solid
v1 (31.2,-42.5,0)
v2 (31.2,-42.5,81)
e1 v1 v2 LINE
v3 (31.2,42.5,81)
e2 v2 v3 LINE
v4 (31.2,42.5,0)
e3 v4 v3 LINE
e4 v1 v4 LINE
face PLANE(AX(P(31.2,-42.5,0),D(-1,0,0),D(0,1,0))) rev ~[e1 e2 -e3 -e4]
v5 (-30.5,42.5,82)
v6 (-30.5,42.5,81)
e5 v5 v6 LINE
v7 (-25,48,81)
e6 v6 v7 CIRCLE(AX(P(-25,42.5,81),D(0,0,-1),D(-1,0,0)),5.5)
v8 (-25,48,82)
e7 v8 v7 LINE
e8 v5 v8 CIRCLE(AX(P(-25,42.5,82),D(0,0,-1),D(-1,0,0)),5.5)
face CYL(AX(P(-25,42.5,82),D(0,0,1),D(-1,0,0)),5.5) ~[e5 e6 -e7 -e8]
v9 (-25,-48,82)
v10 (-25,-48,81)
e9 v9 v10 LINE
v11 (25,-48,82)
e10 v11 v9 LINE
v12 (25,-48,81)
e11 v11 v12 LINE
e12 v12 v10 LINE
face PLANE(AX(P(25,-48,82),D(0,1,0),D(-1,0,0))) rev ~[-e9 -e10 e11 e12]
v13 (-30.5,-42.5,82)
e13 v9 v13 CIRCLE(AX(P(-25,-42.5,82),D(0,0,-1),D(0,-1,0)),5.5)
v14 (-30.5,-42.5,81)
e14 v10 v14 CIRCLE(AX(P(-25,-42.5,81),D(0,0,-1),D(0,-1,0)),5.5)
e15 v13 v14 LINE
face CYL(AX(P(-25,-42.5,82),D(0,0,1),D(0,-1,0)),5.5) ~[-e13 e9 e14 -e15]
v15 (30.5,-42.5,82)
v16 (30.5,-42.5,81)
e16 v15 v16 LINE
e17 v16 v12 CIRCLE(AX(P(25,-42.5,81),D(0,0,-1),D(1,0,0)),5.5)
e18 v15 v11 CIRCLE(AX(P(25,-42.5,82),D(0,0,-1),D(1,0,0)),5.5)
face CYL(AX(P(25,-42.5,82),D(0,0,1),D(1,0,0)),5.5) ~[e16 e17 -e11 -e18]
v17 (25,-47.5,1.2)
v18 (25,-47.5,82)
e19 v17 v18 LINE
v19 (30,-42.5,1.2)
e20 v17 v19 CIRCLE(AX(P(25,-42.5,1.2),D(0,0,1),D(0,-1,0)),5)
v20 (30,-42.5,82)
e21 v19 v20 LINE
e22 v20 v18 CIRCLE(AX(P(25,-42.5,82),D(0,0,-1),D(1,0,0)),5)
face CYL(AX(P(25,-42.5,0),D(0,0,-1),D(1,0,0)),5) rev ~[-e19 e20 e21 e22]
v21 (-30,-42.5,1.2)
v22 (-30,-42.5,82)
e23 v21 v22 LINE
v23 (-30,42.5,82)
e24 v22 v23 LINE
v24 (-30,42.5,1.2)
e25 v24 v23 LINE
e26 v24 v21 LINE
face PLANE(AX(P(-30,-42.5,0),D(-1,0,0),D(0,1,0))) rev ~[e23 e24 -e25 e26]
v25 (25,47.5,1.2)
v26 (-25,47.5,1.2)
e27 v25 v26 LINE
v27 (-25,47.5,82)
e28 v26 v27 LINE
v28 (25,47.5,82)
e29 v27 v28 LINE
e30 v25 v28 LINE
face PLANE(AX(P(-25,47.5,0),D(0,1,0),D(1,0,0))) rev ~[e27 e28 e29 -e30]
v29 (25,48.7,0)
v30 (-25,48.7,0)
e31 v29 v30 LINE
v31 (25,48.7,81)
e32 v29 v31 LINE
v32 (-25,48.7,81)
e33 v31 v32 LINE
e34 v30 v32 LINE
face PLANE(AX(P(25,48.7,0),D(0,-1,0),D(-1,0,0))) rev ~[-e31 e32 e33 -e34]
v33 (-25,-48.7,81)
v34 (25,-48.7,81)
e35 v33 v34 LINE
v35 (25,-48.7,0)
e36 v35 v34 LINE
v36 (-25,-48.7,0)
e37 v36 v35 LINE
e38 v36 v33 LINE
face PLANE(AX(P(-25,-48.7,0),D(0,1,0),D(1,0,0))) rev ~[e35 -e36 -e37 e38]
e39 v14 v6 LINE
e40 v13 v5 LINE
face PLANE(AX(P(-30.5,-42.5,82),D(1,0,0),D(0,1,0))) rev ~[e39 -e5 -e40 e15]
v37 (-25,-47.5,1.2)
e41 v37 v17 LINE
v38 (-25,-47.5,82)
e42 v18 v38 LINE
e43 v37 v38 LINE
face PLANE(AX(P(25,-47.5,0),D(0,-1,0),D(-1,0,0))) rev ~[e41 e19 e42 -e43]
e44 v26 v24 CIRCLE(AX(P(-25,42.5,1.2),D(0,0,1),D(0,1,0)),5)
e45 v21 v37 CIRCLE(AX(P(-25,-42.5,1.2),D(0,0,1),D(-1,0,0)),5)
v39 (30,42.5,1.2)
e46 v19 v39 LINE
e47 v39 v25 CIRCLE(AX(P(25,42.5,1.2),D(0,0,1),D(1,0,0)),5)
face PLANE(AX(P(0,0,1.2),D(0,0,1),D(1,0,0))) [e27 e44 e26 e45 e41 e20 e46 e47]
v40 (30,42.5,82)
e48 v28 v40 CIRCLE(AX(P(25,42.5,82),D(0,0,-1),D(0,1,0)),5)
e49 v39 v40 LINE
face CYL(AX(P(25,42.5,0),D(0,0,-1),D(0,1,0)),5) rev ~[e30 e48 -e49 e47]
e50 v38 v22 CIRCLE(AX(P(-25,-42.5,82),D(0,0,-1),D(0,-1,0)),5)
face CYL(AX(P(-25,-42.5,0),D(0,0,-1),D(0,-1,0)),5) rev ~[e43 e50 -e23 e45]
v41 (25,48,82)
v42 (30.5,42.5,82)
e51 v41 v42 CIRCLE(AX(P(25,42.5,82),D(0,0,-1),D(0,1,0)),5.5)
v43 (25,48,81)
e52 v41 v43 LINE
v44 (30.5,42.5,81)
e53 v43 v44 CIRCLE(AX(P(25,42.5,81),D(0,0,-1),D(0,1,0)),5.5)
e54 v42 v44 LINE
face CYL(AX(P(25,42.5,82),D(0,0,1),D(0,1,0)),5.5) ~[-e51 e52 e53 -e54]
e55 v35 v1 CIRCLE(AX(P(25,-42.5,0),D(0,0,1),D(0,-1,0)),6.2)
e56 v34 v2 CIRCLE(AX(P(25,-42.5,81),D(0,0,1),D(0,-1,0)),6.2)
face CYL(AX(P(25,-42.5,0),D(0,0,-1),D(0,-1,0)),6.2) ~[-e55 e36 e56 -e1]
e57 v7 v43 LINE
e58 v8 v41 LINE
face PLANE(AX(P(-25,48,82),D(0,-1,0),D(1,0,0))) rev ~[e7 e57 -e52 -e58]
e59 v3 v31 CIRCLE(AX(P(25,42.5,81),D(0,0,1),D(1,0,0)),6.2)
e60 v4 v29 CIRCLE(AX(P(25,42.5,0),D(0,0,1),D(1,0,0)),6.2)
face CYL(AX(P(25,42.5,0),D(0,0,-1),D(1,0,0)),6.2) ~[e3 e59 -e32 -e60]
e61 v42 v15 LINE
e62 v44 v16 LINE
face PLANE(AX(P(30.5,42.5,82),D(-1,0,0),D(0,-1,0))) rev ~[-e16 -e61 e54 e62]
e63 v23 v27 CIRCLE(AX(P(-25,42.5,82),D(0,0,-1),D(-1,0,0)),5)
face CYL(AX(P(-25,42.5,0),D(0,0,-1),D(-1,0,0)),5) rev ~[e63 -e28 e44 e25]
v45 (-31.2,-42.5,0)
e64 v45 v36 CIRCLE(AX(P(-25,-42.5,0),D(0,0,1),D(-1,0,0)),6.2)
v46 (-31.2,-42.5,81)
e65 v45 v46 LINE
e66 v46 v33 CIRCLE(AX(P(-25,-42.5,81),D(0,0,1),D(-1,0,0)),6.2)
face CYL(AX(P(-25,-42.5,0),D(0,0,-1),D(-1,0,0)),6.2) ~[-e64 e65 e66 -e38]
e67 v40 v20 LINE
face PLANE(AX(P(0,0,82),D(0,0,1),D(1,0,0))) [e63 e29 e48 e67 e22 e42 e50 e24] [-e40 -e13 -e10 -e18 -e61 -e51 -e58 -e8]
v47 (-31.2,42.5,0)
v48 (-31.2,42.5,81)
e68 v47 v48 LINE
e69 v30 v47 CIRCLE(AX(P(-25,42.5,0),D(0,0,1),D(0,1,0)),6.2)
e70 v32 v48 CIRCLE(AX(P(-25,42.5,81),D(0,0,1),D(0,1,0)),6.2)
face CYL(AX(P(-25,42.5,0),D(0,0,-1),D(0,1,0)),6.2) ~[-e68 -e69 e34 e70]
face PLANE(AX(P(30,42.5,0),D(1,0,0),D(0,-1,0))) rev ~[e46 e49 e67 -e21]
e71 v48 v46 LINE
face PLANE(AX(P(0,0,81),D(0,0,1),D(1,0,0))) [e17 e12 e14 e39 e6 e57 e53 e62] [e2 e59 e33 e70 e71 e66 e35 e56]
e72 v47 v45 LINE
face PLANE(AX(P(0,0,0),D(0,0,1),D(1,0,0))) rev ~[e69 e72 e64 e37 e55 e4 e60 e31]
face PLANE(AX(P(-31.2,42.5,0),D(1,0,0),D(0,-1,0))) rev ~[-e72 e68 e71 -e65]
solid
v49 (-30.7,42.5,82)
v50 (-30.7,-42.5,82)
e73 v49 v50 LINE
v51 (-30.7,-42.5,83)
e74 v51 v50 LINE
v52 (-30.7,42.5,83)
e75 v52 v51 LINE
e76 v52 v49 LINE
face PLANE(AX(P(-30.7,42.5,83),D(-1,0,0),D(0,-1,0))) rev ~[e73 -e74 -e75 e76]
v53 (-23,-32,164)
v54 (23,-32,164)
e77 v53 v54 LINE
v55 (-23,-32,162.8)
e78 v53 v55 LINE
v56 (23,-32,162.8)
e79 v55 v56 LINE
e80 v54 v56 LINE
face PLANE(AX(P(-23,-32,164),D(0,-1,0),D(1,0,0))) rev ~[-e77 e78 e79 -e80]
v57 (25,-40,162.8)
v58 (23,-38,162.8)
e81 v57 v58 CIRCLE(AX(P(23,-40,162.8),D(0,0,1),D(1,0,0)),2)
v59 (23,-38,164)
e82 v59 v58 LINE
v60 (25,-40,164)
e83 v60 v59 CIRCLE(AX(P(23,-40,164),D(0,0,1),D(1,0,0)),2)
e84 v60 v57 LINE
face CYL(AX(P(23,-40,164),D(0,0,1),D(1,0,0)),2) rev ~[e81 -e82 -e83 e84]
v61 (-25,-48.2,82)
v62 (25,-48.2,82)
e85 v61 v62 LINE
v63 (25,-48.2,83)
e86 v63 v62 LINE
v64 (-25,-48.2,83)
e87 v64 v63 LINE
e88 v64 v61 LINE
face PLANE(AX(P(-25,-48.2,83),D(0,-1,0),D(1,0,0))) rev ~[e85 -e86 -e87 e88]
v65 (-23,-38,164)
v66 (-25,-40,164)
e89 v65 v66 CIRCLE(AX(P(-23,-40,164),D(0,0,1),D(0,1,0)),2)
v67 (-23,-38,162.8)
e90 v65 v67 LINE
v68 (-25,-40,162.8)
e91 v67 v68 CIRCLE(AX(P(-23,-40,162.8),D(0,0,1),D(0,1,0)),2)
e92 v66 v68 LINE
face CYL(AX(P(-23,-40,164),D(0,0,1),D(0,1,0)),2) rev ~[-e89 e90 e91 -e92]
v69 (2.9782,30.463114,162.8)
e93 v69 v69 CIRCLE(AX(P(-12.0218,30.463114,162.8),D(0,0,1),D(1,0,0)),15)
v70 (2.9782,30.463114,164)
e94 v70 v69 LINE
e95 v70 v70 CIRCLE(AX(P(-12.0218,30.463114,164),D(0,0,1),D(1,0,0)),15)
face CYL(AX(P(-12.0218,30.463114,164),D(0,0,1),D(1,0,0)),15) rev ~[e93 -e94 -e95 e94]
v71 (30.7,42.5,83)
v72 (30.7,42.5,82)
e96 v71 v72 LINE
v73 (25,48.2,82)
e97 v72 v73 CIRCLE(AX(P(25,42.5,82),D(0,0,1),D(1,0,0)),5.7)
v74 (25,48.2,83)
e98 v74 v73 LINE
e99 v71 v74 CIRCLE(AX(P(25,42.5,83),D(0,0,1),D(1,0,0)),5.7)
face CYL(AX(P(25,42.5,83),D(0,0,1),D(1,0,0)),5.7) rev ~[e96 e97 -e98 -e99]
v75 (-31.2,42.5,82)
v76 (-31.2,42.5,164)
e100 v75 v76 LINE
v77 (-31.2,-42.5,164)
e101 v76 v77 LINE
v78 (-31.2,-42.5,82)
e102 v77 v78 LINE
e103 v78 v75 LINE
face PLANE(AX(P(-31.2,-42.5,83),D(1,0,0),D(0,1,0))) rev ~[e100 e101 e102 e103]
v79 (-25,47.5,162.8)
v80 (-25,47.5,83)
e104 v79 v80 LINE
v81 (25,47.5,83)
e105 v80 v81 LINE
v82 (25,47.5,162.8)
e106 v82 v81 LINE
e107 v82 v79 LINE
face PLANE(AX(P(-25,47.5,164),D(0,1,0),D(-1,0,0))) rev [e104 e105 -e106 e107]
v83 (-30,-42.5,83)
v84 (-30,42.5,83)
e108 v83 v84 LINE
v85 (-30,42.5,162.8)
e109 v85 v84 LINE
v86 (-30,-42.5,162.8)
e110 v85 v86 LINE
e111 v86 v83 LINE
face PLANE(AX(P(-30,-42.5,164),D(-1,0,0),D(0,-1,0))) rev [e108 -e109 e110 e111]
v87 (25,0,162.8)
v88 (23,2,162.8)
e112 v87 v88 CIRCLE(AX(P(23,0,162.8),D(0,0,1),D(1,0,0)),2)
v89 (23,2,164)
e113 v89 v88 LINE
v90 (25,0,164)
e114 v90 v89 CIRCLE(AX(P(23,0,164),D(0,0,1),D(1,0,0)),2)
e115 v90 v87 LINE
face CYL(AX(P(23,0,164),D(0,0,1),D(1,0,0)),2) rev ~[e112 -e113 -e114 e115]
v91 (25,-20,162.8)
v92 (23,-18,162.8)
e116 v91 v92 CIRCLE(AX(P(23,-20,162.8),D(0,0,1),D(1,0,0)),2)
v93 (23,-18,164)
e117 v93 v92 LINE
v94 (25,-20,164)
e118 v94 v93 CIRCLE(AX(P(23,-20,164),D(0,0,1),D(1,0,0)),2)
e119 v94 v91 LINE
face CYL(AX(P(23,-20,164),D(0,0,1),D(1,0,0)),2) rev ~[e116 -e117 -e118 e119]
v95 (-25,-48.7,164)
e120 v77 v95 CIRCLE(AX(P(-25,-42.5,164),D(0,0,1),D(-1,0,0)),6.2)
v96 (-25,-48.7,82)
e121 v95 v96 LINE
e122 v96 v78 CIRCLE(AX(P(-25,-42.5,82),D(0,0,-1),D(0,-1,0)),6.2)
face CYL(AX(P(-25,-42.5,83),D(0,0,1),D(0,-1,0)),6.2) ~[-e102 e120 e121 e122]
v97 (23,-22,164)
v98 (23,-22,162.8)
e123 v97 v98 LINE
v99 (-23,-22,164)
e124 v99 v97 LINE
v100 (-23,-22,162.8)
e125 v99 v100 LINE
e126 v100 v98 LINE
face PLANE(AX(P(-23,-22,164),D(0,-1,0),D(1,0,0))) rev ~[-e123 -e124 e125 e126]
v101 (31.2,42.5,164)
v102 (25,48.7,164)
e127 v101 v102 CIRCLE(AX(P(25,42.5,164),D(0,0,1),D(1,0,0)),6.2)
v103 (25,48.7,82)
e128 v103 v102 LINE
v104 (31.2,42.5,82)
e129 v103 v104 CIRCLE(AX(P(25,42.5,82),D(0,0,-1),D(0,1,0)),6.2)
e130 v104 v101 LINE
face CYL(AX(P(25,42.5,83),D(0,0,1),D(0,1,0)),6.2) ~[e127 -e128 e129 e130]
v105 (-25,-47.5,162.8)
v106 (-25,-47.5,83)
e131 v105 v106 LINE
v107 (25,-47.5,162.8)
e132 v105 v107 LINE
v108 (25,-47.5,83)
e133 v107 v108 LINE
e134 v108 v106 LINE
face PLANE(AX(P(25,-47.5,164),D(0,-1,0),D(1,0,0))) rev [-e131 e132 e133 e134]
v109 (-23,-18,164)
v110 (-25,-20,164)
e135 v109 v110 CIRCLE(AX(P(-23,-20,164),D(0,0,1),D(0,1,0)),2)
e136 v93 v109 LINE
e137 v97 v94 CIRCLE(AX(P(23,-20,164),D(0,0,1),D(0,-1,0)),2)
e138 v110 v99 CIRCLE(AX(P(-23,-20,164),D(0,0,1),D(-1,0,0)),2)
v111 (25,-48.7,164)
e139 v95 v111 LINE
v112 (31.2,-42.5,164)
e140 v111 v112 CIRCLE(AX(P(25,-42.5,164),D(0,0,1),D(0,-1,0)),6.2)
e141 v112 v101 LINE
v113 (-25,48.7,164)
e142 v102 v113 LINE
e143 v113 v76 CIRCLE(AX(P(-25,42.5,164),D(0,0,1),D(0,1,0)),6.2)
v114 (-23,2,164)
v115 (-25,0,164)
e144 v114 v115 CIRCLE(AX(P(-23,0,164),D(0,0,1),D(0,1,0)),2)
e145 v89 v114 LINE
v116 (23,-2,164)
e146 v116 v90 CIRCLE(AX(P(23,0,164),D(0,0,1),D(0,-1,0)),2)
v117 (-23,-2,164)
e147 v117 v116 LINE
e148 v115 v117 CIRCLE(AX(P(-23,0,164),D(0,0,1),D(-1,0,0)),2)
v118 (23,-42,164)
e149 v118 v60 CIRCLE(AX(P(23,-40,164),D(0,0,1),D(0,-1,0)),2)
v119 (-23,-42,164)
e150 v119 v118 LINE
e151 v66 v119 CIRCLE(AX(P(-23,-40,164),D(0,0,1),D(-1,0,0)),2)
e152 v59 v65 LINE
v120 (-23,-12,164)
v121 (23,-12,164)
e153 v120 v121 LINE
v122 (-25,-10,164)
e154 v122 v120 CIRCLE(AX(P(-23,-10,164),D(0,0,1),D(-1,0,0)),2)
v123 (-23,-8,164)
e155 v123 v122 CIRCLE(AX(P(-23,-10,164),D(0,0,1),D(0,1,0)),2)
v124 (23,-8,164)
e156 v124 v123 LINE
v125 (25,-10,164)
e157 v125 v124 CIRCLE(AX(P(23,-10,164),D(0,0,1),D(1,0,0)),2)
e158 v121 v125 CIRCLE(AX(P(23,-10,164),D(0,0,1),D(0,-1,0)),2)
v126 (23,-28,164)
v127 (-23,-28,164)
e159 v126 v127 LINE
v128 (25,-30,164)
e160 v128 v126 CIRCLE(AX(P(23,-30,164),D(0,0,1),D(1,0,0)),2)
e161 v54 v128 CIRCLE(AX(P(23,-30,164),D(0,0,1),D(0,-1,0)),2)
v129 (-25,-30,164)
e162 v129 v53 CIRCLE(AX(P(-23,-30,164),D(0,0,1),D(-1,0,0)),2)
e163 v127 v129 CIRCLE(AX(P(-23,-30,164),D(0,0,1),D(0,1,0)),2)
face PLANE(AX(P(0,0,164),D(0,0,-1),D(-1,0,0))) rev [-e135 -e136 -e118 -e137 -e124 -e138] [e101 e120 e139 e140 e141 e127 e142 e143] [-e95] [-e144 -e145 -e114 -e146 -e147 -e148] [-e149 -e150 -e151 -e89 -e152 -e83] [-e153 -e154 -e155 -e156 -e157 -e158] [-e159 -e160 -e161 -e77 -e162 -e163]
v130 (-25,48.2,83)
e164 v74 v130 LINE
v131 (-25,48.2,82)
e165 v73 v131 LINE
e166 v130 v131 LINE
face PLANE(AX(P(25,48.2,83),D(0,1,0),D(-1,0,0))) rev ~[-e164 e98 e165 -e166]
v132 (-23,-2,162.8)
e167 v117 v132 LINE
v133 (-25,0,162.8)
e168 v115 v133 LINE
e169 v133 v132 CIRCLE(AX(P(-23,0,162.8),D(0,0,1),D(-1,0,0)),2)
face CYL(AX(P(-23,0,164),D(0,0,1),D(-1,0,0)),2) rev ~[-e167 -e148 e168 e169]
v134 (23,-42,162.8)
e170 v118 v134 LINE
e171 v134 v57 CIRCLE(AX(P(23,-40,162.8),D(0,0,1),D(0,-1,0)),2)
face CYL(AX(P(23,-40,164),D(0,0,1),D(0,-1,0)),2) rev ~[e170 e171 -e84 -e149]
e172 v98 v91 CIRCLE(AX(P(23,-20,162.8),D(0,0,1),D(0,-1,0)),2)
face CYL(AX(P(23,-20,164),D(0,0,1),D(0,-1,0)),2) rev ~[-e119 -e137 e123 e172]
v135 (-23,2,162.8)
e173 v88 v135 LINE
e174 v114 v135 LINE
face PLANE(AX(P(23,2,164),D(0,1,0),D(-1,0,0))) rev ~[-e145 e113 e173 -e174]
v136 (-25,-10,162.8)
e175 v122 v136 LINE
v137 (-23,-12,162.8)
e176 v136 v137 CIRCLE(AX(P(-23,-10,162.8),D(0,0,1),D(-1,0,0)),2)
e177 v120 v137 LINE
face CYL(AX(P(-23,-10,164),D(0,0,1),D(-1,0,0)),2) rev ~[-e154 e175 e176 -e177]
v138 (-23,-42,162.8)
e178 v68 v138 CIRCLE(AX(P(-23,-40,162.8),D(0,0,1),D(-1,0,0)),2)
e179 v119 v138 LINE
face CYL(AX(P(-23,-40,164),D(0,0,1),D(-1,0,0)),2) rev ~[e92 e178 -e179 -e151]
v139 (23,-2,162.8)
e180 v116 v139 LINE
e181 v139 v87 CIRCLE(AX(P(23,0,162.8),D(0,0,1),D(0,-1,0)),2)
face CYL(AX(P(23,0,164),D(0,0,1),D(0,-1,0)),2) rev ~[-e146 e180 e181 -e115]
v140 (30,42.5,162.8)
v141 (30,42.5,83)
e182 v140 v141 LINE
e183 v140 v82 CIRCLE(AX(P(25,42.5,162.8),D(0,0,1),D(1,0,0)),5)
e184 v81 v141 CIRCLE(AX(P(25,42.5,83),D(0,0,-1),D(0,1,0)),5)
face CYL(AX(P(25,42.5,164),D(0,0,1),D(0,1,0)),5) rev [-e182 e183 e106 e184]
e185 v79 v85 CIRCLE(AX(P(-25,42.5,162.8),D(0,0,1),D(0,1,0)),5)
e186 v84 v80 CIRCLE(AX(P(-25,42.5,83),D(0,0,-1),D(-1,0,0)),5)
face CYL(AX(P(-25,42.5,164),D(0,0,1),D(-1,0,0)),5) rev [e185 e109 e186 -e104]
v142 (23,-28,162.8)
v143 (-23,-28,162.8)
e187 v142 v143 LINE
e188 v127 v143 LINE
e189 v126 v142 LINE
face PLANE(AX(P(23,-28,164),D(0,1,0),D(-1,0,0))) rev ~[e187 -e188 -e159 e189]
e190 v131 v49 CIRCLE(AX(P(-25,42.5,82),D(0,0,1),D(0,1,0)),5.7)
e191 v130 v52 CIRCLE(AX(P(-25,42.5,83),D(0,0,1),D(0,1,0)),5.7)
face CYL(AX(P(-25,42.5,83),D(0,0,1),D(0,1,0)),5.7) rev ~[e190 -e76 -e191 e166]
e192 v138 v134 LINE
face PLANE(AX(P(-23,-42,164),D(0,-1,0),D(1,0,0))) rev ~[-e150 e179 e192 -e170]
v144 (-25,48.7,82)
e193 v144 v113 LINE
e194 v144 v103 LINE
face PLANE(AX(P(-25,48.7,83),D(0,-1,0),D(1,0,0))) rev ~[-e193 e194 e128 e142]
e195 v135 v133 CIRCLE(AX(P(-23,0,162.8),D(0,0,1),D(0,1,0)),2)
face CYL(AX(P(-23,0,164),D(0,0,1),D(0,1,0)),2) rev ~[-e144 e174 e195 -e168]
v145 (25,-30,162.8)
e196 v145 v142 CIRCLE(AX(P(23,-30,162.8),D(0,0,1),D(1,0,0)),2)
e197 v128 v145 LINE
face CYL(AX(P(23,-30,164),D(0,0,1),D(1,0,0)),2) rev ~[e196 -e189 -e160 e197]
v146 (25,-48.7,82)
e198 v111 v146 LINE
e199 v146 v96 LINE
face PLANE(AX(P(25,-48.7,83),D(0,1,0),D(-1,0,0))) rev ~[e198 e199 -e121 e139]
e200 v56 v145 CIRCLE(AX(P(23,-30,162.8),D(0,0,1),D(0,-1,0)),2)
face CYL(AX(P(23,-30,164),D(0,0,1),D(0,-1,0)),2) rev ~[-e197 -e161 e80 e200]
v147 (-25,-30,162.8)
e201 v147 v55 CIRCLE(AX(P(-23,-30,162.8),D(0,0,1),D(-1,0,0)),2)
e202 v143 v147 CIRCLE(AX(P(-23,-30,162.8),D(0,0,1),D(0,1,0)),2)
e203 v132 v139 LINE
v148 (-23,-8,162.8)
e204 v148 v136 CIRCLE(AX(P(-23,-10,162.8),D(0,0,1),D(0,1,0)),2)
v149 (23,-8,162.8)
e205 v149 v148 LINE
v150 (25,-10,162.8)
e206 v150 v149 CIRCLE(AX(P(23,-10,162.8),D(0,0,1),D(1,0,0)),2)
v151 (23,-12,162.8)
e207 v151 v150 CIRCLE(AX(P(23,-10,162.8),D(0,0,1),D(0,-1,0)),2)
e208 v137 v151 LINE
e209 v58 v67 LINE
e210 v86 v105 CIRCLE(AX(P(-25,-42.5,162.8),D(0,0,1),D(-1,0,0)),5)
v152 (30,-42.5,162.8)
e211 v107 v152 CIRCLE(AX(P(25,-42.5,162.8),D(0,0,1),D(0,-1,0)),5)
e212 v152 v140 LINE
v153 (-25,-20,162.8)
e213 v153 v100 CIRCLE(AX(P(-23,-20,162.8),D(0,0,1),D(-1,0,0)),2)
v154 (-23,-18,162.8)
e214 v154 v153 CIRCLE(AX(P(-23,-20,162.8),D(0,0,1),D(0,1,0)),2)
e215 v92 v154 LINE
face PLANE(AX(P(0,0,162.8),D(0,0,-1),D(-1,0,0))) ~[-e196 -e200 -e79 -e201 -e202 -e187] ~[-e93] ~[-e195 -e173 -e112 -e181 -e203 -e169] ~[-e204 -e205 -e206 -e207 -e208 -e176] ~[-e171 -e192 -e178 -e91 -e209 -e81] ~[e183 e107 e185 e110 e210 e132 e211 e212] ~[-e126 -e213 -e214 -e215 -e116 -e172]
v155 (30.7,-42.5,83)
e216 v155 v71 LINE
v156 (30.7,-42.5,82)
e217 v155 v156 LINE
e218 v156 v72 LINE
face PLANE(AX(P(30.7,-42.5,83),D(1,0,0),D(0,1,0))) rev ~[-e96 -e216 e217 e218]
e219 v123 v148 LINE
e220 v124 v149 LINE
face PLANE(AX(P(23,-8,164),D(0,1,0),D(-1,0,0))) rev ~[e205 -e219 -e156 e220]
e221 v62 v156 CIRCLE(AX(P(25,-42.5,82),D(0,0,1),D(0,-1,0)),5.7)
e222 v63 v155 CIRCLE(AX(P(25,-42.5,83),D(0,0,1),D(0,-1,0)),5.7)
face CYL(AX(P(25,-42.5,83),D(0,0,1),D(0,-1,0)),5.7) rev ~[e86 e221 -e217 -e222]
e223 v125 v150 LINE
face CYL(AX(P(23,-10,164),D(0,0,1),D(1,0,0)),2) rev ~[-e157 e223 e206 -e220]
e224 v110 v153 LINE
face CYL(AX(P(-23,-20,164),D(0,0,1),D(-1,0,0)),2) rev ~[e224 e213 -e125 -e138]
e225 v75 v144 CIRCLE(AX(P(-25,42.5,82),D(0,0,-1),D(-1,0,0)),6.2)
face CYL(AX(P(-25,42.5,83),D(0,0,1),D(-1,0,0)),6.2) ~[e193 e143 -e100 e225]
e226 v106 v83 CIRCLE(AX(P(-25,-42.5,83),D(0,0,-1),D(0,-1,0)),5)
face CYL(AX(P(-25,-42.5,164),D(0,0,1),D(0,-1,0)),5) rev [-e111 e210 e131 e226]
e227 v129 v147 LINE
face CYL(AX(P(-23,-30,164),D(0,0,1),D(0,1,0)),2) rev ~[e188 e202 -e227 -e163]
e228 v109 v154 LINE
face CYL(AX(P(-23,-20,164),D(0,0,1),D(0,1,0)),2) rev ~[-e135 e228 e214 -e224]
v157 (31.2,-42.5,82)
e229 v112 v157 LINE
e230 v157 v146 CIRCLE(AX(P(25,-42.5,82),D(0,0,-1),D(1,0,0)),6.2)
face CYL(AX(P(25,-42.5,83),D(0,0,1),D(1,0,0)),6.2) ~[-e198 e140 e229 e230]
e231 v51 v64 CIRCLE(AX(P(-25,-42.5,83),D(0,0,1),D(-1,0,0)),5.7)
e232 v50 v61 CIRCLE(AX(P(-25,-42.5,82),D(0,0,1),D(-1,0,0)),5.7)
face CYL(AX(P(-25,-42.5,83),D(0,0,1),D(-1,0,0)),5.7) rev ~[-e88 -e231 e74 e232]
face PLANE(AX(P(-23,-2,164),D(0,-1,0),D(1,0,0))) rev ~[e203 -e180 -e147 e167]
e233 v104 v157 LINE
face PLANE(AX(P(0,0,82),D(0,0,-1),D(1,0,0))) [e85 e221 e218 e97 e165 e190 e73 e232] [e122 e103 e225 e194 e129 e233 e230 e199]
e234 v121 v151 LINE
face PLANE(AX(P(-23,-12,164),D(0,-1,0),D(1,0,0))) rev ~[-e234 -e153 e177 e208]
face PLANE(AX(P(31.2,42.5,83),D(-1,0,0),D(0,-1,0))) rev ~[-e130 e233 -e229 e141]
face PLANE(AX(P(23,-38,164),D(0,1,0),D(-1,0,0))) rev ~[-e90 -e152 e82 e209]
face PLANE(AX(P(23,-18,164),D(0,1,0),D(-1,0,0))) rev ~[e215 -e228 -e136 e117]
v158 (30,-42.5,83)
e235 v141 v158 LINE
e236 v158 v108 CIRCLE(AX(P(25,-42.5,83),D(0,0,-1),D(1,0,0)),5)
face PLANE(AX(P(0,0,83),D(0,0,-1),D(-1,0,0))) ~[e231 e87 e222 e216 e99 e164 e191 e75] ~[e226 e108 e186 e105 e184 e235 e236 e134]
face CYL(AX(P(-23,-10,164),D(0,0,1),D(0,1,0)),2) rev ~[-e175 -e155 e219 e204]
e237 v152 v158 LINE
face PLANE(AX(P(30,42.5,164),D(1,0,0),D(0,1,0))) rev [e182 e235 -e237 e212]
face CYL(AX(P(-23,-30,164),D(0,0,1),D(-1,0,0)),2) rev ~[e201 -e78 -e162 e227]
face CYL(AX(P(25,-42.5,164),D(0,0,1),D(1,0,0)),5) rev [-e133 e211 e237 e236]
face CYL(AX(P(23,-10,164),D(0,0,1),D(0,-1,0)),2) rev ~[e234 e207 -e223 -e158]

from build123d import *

# Parameters (mm, degrees)
F1_DEPTH  = 82
F2_DEPTH  = 1.2
F4_DEPTH  = 1
F7_DEPTH  = 1
F8_DEPTH  = 1
F9_R      = 15
F10_DEPTH = 1.2


# Not quite as in the source:
# - a feature names something its author has since deleted; it is built from what else it names


with BuildPart() as f1:
    # F0 (on Top) → F1 (new body)
    with BuildSketch(Plane.XY):
        with BuildLine():
            Line((31.2, -42.5), (31.2, 42.5))
            ThreePointArc((31.2, 42.5), (29.3840620434, 46.8840620434), (25, 48.7))
            Line((25, 48.7), (-25, 48.7))
            ThreePointArc((-25, 48.7), (-29.3840620434, 46.8840620434), (-31.2, 42.5))
            Line((-31.2, 42.5), (-31.2, -42.5))
            ThreePointArc((-31.2, -42.5), (-29.3840620434, -46.8840620434), (-25, -48.7))
            Line((-25, -48.7), (25, -48.7))
            ThreePointArc((25, -48.7), (29.3840620434, -46.8840620434), (31.2, -42.5))
        make_face()
        with BuildLine():
            Line((-25, 47.5), (25, 47.5))
            ThreePointArc((25, 47.5), (28.5355339059, 46.0355339059), (30, 42.5))
            Line((30, 42.5), (30, -42.5))
            ThreePointArc((30, -42.5), (28.5355339059, -46.0355339059), (25, -47.5))
            Line((25, -47.5), (-25, -47.5))
            ThreePointArc((-25, -47.5), (-28.5355339059, -46.0355339059), (-30, -42.5))
            Line((-30, -42.5), (-30, 42.5))
            ThreePointArc((-30, 42.5), (-28.5355339059, 46.0355339059), (-25, 47.5))
        make_face(mode=Mode.SUBTRACT)
    extrude(amount=F1_DEPTH)

    # F0 (on Top) → F2 (join)
    with BuildSketch(Plane.XY):
        with BuildLine():
            ThreePointArc((30, 42.5), (28.5355339059, 46.0355339059), (25, 47.5))
            Line((25, 47.5), (-25, 47.5))
            ThreePointArc((-25, 47.5), (-28.5355339059, 46.0355339059), (-30, 42.5))
            Line((-30, 42.5), (-30, -42.5))
            ThreePointArc((-30, -42.5), (-28.5355339059, -46.0355339059), (-25, -47.5))
            Line((-25, -47.5), (25, -47.5))
            ThreePointArc((25, -47.5), (28.5355339059, -46.0355339059), (30, -42.5))
            Line((30, -42.5), (30, 42.5))
        make_face()
    extrude(amount=F2_DEPTH)

    # F3 (on face) → F4 (cut)
    with BuildSketch(Plane.XY.offset(82)):
        with BuildLine():
            ThreePointArc((25, -48.7), (29.3840620434, -46.8840620434), (31.2, -42.5))
            Line((31.2, -42.5), (31.2, 42.5))
            ThreePointArc((31.2, 42.5), (29.3840620434, 46.8840620434), (25, 48.7))
            Line((25, 48.7), (-25, 48.7))
            ThreePointArc((-25, 48.7), (-29.3840620434, 46.8840620434), (-31.2, 42.5))
            Line((-31.2, 42.5), (-31.2, -42.5))
            ThreePointArc((-31.2, -42.5), (-29.3840620434, -46.8840620434), (-25, -48.7))
            Line((-25, -48.7), (25, -48.7))
        make_face()
        with BuildLine():
            ThreePointArc((-25, -48), (-28.8890872965, -46.3890872965), (-30.5, -42.5))
            Line((-30.5, -42.5), (-30.5, 42.5))
            ThreePointArc((-30.5, 42.5), (-28.8890872965, 46.3890872965), (-25, 48))
            Line((-25, 48), (25, 48))
            ThreePointArc((25, 48), (28.8890872965, 46.3890872965), (30.5, 42.5))
            Line((30.5, 42.5), (30.5, -42.5))
            ThreePointArc((30.5, -42.5), (28.8890872965, -46.3890872965), (25, -48))
            Line((25, -48), (-25, -48))
        make_face(mode=Mode.SUBTRACT)
    extrude(amount=-F4_DEPTH, mode=Mode.SUBTRACT)


with BuildPart() as f5_1:
    # F5: instance of F1
    add(f1.part.mirror(Plane.XY.offset(82)))

    # F6 (on face) → F7 (join)
    with BuildSketch(Plane(origin=(0, 0, 83), x_dir=(1, 0, 0), z_dir=(0, 0, -1))):
        with BuildLine():
            Line((31.2, -42.5), (31.2, 42.5))
            ThreePointArc((31.2, 42.5), (29.3840620434, 46.8840620434), (25, 48.7))
            Line((25, 48.7), (-25, 48.7))
            ThreePointArc((-25, 48.7), (-29.3840620434, 46.8840620434), (-31.2, 42.5))
            Line((-31.2, 42.5), (-31.2, -42.5))
            ThreePointArc((-31.2, -42.5), (-29.3840620434, -46.8840620434), (-25, -48.7))
            Line((-25, -48.7), (25, -48.7))
            ThreePointArc((25, -48.7), (29.3840620434, -46.8840620434), (31.2, -42.5))
        make_face()
        with BuildLine():
            ThreePointArc((25, 48.2), (29.0305086528, 46.5305086528), (30.7, 42.5))
            Line((30.7, 42.5), (30.7, -42.5))
            ThreePointArc((30.7, -42.5), (29.0305086528, -46.5305086528), (25, -48.2))
            Line((25, -48.2), (-25, -48.2))
            ThreePointArc((-25, -48.2), (-29.0305086528, -46.5305086528), (-30.7, -42.5))
            Line((-30.7, -42.5), (-30.7, 42.5))
            ThreePointArc((-30.7, 42.5), (-29.0305086528, 46.5305086528), (-25, 48.2))
            Line((-25, 48.2), (25, 48.2))
        make_face(mode=Mode.SUBTRACT)
    extrude(amount=F7_DEPTH)

    # F8 (cut): a face of the model
    f8_faces = [f5_1.faces().sort_by_distance(p)[0] for p in [
        (28.808660311, -46.308660311, 82),
    ]]
    extrude(f8_faces, amount=-F8_DEPTH, mode=Mode.SUBTRACT)

    # F9 (on face) → F10 (cut)
    with BuildSketch(Plane.XY.offset(164)):
        with Locations((-12.0217995225, 30.4631138757)):
            Circle(F9_R)
        with BuildLine():
            ThreePointArc((25, 0), (24.4142135624, 1.4142135624), (23, 2))
            Line((23, 2), (-23, 2))
            ThreePointArc((-23, 2), (-24.4142135624, 1.4142135624), (-25, 0))
            ThreePointArc((-25, 0), (-24.4142135624, -1.4142135624), (-23, -2))
            Line((-23, -2), (23, -2))
            ThreePointArc((23, -2), (24.4142135624, -1.4142135624), (25, 0))
        make_face()
        with BuildLine():
            ThreePointArc((-23, -8), (-24.4142135624, -8.5857864376), (-25, -10))
            ThreePointArc((-25, -10), (-24.4142135624, -11.4142135624), (-23, -12))
            Line((-23, -12), (23, -12))
            ThreePointArc((23, -12), (24.4142135624, -11.4142135624), (25, -10))
            ThreePointArc((25, -10), (24.4142135624, -8.5857864376), (23, -8))
            Line((23, -8), (-23, -8))
        make_face()
        with BuildLine():
            ThreePointArc((-23, -18), (-24.4142135624, -18.5857864376), (-25, -20))
            ThreePointArc((-25, -20), (-24.4142135624, -21.4142135624), (-23, -22))
            Line((-23, -22), (23, -22))
            ThreePointArc((23, -22), (24.4142135624, -21.4142135624), (25, -20))
            ThreePointArc((25, -20), (24.4142135624, -18.5857864376), (23, -18))
            Line((23, -18), (-23, -18))
        make_face()
        with BuildLine():
            ThreePointArc((-23, -28), (-24.4142135624, -28.5857864376), (-25, -30))
            ThreePointArc((-25, -30), (-24.4142135624, -31.4142135624), (-23, -32))
            Line((-23, -32), (23, -32))
            ThreePointArc((23, -32), (24.4142135624, -31.4142135624), (25, -30))
            ThreePointArc((25, -30), (24.4142135624, -28.5857864376), (23, -28))
            Line((23, -28), (-23, -28))
        make_face()
        with BuildLine():
            ThreePointArc((-23, -38), (-24.4142135624, -38.5857864376), (-25, -40))
            ThreePointArc((-25, -40), (-24.4142135624, -41.4142135624), (-23, -42))
            Line((-23, -42), (23, -42))
            ThreePointArc((23, -42), (24.4142135624, -41.4142135624), (25, -40))
            ThreePointArc((25, -40), (24.4142135624, -38.5857864376), (23, -38))
            Line((23, -38), (-23, -38))
        make_face()
    extrude(amount=-F10_DEPTH, mode=Mode.SUBTRACT)


solid = Compound([f1.part, f5_1.part])
